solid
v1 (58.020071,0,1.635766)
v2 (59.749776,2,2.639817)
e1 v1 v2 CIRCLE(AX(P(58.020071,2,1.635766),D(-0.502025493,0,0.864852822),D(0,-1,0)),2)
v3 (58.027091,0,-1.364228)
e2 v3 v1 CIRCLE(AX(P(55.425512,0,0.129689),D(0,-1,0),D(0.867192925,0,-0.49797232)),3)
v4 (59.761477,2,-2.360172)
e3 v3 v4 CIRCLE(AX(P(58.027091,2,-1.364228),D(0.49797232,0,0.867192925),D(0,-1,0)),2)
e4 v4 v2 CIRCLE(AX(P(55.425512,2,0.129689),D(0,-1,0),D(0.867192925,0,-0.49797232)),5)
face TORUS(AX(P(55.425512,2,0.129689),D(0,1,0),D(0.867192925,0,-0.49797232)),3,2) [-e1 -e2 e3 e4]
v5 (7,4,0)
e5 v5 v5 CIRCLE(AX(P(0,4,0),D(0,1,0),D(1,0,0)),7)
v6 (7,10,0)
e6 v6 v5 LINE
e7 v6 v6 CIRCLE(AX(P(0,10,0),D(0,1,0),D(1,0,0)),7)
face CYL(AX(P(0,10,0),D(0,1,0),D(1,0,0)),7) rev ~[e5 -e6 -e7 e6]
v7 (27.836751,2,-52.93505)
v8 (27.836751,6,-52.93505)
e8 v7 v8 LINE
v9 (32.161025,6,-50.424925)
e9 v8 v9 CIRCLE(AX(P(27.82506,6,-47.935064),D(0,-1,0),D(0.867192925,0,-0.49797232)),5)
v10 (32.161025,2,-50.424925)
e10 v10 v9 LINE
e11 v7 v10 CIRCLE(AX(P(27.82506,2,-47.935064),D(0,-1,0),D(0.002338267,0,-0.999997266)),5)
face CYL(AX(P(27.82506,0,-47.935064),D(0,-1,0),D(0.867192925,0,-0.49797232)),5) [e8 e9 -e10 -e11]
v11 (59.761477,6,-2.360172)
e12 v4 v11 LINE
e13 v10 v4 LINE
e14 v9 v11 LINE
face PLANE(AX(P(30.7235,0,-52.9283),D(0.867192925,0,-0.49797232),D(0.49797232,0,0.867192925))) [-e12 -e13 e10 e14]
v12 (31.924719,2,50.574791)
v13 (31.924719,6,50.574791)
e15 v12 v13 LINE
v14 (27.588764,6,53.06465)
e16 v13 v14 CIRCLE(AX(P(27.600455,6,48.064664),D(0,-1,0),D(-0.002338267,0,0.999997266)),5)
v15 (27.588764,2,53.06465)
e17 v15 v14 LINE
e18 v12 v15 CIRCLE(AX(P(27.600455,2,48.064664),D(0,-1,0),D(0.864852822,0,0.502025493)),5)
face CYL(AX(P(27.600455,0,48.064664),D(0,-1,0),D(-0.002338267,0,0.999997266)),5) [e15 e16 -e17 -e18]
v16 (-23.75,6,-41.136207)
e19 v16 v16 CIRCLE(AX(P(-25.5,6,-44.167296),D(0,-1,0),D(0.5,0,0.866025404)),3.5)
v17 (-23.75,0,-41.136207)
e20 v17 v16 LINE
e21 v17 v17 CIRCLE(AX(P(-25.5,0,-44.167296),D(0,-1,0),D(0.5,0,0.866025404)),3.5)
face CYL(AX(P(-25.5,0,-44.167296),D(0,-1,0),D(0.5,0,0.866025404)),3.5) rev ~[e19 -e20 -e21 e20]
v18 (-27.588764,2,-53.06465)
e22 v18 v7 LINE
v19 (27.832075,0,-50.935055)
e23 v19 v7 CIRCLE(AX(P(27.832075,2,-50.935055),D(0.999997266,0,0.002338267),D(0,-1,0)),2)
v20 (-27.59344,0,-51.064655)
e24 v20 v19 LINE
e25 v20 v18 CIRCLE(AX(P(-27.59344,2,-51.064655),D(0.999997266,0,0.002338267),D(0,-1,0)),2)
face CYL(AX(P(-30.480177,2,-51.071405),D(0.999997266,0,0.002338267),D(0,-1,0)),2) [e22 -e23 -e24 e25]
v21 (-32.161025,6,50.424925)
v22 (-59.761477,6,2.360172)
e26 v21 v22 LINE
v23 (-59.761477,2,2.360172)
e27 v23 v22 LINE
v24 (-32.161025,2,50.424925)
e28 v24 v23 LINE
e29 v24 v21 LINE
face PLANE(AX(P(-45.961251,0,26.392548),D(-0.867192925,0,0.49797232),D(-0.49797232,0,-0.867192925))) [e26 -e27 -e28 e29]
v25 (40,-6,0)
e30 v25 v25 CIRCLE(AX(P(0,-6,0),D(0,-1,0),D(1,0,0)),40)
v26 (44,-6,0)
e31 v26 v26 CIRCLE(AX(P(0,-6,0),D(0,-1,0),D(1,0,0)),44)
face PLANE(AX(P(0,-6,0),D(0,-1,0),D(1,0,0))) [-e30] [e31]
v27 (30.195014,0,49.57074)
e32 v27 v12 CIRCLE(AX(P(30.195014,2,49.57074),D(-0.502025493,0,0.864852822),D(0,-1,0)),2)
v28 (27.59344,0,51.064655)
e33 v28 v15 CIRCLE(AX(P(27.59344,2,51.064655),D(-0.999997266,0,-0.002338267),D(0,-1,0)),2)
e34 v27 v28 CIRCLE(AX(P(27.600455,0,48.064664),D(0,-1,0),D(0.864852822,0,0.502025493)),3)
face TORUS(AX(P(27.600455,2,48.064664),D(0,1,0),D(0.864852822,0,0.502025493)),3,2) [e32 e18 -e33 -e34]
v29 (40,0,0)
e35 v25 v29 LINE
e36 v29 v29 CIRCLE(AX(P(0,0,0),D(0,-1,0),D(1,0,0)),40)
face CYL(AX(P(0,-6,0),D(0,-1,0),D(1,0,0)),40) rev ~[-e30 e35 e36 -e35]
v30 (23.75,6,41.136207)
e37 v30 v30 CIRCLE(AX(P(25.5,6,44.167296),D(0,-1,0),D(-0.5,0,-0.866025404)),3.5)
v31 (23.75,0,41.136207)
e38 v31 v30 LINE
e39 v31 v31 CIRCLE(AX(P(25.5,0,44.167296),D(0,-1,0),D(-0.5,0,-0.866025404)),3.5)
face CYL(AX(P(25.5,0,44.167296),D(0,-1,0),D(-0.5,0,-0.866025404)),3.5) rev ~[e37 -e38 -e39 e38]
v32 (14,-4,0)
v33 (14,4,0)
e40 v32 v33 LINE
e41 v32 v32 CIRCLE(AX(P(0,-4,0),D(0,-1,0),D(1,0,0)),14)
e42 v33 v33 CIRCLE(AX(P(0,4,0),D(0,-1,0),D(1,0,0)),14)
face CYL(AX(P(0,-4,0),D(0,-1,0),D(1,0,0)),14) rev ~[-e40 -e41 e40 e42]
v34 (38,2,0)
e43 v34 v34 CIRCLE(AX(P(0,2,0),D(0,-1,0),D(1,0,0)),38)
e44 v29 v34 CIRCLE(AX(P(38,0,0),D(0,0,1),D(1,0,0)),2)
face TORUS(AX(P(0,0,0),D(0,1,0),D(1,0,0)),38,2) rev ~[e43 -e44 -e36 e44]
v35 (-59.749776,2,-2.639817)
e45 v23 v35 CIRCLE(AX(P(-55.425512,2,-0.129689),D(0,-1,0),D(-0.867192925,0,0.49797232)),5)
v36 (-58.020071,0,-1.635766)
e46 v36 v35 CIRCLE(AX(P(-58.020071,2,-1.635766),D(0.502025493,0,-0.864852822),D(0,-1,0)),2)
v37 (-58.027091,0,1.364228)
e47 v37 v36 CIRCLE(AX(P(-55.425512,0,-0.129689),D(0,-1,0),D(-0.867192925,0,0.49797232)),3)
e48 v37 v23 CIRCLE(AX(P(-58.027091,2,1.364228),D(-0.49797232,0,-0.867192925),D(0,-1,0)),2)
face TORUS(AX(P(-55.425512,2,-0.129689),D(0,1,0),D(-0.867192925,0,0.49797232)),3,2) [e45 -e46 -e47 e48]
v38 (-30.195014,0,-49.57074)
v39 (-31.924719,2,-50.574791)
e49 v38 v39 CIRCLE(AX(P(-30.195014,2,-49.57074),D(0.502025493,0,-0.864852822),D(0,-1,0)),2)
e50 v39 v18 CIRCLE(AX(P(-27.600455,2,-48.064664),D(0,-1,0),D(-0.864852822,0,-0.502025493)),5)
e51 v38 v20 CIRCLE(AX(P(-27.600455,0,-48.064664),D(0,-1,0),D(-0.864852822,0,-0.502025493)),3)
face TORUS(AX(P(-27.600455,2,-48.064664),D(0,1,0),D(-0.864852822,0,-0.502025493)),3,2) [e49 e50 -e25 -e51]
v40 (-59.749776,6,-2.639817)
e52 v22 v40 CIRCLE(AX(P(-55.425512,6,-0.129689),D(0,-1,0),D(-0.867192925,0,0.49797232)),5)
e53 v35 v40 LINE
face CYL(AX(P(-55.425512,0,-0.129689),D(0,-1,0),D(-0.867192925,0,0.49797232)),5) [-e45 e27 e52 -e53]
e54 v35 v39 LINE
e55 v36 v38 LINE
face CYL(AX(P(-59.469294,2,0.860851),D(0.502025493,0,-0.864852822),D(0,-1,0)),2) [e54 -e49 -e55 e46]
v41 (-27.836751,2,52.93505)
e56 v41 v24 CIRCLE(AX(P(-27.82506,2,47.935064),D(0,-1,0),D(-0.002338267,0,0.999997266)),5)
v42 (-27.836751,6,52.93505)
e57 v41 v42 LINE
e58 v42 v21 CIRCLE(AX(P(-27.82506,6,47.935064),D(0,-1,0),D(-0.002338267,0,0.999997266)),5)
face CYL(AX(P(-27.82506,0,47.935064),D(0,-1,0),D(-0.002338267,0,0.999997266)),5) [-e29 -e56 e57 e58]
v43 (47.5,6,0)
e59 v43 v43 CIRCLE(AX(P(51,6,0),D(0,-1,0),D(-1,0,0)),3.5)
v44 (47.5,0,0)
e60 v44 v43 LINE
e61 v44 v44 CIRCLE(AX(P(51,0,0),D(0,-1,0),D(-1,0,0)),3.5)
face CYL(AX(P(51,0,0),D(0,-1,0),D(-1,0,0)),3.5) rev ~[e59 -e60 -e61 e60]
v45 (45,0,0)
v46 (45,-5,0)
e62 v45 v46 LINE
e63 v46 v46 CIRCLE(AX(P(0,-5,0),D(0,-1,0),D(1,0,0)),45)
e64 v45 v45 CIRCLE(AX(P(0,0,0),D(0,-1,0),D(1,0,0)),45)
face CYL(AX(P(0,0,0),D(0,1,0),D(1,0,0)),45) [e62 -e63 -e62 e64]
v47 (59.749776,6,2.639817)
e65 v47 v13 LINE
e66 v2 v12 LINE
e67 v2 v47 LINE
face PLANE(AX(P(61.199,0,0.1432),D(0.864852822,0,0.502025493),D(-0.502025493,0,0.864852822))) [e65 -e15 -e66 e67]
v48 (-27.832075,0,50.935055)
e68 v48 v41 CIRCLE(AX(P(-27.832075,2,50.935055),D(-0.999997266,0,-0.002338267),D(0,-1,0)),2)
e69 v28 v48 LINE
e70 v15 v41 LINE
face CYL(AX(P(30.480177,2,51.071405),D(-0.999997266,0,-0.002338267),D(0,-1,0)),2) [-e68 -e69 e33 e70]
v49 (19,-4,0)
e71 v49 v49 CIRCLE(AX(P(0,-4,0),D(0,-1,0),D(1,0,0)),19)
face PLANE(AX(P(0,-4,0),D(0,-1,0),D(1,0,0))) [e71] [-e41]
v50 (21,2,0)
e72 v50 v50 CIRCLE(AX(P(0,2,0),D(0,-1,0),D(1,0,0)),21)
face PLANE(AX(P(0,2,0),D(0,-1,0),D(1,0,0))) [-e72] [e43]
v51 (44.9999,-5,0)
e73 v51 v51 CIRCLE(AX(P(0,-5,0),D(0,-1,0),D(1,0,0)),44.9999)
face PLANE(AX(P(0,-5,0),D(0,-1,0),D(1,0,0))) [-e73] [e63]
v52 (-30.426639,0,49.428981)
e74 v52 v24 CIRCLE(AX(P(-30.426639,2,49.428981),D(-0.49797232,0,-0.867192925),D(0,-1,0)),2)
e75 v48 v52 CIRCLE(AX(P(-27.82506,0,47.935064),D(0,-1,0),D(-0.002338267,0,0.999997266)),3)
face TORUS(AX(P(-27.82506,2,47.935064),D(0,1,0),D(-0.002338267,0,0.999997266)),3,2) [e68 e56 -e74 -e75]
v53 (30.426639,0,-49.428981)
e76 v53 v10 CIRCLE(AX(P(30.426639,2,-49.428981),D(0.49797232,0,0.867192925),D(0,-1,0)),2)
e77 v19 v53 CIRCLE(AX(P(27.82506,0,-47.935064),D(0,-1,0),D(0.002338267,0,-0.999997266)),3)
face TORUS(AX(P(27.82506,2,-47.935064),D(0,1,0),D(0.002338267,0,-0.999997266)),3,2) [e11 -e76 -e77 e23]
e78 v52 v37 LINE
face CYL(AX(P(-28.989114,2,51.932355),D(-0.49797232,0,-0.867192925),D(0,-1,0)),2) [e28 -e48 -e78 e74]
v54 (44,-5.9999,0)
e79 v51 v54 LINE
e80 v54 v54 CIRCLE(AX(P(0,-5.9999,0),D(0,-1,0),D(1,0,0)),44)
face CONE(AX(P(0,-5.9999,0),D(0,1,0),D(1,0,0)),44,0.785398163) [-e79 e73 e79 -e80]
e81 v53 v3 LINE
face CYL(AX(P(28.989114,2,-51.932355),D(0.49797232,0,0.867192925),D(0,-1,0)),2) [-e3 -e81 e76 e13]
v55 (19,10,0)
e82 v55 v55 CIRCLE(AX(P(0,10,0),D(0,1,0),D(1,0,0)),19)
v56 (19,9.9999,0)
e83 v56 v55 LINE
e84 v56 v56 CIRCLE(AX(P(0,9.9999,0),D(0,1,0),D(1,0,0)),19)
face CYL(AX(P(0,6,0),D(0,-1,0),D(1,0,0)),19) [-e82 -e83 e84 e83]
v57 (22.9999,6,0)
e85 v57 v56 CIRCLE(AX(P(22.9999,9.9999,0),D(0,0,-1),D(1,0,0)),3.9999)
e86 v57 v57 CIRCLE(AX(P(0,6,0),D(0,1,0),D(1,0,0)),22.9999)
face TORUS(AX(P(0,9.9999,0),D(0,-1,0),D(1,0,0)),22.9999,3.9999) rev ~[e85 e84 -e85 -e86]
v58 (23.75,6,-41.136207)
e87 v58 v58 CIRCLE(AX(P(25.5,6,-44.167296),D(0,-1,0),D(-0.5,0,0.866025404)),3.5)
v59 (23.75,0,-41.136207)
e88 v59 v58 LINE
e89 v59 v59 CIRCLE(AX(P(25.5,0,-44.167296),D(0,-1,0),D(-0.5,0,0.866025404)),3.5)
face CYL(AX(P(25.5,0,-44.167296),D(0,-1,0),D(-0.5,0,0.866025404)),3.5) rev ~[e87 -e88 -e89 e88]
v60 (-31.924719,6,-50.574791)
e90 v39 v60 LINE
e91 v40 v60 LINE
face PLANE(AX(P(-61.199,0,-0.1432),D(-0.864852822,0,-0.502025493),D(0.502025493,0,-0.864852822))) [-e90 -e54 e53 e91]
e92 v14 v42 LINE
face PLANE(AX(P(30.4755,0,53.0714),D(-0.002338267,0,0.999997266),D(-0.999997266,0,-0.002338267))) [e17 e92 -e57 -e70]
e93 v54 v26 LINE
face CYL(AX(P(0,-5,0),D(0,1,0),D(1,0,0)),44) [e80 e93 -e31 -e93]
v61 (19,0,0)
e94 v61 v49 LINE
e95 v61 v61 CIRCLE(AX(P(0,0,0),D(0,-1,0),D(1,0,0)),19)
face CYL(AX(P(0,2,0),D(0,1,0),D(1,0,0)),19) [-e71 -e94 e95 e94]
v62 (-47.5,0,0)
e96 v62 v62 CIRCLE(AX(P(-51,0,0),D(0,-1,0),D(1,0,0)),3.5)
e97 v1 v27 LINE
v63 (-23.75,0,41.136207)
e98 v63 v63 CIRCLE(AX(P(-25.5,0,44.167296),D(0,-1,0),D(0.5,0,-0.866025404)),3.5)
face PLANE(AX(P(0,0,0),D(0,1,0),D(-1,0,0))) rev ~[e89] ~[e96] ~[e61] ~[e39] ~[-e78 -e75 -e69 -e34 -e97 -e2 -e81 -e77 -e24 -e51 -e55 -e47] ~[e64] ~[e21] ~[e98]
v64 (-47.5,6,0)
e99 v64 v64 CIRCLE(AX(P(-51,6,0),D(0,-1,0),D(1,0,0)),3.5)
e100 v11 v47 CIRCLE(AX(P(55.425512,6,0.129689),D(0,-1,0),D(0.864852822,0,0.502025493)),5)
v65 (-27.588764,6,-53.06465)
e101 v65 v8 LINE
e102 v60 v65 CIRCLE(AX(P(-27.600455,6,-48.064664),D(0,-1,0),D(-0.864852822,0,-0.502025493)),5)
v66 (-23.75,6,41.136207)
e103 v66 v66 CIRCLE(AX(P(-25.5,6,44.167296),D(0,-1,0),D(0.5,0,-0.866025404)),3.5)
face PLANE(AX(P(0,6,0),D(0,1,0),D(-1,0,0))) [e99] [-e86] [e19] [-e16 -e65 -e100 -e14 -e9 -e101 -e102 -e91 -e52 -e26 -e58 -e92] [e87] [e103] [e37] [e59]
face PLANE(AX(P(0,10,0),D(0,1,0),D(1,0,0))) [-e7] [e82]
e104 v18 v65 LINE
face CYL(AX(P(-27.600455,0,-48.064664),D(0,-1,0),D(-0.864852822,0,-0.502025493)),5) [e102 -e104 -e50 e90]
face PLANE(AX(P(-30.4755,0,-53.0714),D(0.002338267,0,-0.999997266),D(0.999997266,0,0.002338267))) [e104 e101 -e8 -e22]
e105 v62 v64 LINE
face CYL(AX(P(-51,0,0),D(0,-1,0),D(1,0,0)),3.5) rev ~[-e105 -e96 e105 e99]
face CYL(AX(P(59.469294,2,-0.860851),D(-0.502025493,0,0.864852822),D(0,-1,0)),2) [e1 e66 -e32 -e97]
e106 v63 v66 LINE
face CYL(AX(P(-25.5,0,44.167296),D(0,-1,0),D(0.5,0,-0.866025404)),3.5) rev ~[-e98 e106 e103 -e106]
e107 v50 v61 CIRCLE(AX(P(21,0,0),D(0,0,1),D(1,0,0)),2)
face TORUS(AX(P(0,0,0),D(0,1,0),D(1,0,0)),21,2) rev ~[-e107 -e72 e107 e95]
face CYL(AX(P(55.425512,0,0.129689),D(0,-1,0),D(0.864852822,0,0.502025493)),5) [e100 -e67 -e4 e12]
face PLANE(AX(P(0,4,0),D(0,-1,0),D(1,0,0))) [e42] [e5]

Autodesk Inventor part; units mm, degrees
ref_plane "YZ Plane" through (0, 0, 0) normal (1, 0, 0) x (0, 1, 0)
ref_plane "XZ Plane" through (0, 0, 0) normal (0, 1, 0) x (-1, 0, 0)
ref_plane "XY Plane" through (0, 0, 0) normal (0, 0, 1) x (1, 0, 0)
sketch "Sketch1" plane through (0, 0, 0) normal (0, 1, 0) x (-1, 0, 0)
  circle A0 centre (0, 0) radius 53
  line L0 (-30.4755, 53.0714) -> (30.7235, 52.9283)
  line L1 (30.7235, 52.9283) -> (61.199, -0.1432)
  line L2 (61.199, -0.1432) -> (30.4755, -53.0714)
  line L3 (30.4755, -53.0714) -> (-30.7235, -52.9283)
  line L4 (-30.7235, -52.9283) -> (-61.199, 0.1432)
  line L5 (-61.199, 0.1432) -> (-30.4755, 53.0714)
  point P0 (-45.8372, 26.6073)
  dimension "d0" = 106
extrude "Extrusion1" add sketch "Sketch1" along normal blind 6
sketch "Sketch2" plane through (0, 6, 0) normal (0, 1, 0) x (1, 0, 0)
  circle A0 centre (0, 0) radius 19
  dimension "d3" = 38
extrude "Extrusion2" add sketch "Sketch2" along normal blind 4
sketch "Sketch3" plane through (0, 10, 0) normal (0, 1, 0) x (1, 0, 0)
  circle A0 centre (0, 0) radius 7
  dimension "d6" = 14
extrude "Extrusion3" cut sketch "Sketch3" against normal blind 10
fillet "Fillet1" radius 4 1 edges at (-19, 6, 0)
sketch "Sketch4" plane through (0, 0, 0) normal (0, -1, 0) x (1, 0, 0)
  circle A0 centre (0, 0) radius 45
  dimension "d10" = 90
extrude "Extrusion4" add sketch "Sketch4" along normal blind 5
sketch "Sketch5" plane through (0, -5, 0) normal (0, -1, 0) x (1, 0, 0)
  circle A0 centre (0, 0) radius 44
  dimension "d13" = 88
extrude "Extrusion5" add sketch "Sketch5" along normal blind 1
sketch "Sketch6" plane through (0, -6, 0) normal (0, -1, 0) x (1, 0, 0)
  circle A0 centre (0, 0) radius 40
  dimension "d16" = 80
extrude "Extrusion6" cut sketch "Sketch6" against normal blind 8
chamfer "Chamfer1" distance 1 angle 45 1 edges at (-44, -5, 0) measured on face at (33.706, -5.6667, -28.2827)
fillet "Fillet2" radius 2 7 edges at (-40, 2, 0) (-0.124, 0, 52.9999) (45.8372, 0, 26.6073) (-45.9612, 0, 26.3926) (-45.8372, 0, -26.6073) (45.9612, 0, -26.3926) (0.124, 0, -52.9999)
fillet "Fillet3" radius 5 12 edges at (30.3839, 0.5858, -52.3433) (30.7235, 4, -52.9283) (60.5226, 0.5858, 0.1416) (61.199, 4, 0.1432) (-30.4755, 4, -53.0714) (-30.1387, 0.5858, -52.4849) (30.4755, 4, 53.0714) (30.1387, 0.5858, 52.4849) (-30.7235, 4, 52.9283) (-30.3839, 0.5858, 52.3433) (-61.199, 4, -0.1432) (-60.5226, 0.5858, -0.1416)
sketch "Sketch9" plane through (0, 2, 0) normal (0, -1, 0) x (1, 0, 0)
  circle A0 centre (0, 0) radius 19
  dimension "d28" = 38
extrude "Extrusion7" add sketch "Sketch9" along normal blind 6
sketch "Sketch10" plane through (0, -4, 0) normal (0, -1, 0) x (1, 0, 0)
  circle A0 centre (0, 0) radius 14
  dimension "d31" = 28
extrude "Extrusion8" cut sketch "Sketch10" against normal blind 8
fillet "Fillet4" radius 2 1 edges at (-19, 2, 0)
sketch "Sketch11" plane through (0, 0, 0) normal (0, -1, 0) x (1, 0, 0)
  line L0 (0, 0) -> (-51, 0)
  circle A0 centre (-51, 0) radius 3.5
  dimension "d35" = 51
  dimension "d36" = 7
extrude "Extrusion9" cut sketch "Sketch11" against normal blind 10
pattern_circular "Circular Pattern1" count 6 over 360 about axis through (0, 10, 0) along (0, -1, 0) of "Extrusion9"
properties part number "crank case cover"
